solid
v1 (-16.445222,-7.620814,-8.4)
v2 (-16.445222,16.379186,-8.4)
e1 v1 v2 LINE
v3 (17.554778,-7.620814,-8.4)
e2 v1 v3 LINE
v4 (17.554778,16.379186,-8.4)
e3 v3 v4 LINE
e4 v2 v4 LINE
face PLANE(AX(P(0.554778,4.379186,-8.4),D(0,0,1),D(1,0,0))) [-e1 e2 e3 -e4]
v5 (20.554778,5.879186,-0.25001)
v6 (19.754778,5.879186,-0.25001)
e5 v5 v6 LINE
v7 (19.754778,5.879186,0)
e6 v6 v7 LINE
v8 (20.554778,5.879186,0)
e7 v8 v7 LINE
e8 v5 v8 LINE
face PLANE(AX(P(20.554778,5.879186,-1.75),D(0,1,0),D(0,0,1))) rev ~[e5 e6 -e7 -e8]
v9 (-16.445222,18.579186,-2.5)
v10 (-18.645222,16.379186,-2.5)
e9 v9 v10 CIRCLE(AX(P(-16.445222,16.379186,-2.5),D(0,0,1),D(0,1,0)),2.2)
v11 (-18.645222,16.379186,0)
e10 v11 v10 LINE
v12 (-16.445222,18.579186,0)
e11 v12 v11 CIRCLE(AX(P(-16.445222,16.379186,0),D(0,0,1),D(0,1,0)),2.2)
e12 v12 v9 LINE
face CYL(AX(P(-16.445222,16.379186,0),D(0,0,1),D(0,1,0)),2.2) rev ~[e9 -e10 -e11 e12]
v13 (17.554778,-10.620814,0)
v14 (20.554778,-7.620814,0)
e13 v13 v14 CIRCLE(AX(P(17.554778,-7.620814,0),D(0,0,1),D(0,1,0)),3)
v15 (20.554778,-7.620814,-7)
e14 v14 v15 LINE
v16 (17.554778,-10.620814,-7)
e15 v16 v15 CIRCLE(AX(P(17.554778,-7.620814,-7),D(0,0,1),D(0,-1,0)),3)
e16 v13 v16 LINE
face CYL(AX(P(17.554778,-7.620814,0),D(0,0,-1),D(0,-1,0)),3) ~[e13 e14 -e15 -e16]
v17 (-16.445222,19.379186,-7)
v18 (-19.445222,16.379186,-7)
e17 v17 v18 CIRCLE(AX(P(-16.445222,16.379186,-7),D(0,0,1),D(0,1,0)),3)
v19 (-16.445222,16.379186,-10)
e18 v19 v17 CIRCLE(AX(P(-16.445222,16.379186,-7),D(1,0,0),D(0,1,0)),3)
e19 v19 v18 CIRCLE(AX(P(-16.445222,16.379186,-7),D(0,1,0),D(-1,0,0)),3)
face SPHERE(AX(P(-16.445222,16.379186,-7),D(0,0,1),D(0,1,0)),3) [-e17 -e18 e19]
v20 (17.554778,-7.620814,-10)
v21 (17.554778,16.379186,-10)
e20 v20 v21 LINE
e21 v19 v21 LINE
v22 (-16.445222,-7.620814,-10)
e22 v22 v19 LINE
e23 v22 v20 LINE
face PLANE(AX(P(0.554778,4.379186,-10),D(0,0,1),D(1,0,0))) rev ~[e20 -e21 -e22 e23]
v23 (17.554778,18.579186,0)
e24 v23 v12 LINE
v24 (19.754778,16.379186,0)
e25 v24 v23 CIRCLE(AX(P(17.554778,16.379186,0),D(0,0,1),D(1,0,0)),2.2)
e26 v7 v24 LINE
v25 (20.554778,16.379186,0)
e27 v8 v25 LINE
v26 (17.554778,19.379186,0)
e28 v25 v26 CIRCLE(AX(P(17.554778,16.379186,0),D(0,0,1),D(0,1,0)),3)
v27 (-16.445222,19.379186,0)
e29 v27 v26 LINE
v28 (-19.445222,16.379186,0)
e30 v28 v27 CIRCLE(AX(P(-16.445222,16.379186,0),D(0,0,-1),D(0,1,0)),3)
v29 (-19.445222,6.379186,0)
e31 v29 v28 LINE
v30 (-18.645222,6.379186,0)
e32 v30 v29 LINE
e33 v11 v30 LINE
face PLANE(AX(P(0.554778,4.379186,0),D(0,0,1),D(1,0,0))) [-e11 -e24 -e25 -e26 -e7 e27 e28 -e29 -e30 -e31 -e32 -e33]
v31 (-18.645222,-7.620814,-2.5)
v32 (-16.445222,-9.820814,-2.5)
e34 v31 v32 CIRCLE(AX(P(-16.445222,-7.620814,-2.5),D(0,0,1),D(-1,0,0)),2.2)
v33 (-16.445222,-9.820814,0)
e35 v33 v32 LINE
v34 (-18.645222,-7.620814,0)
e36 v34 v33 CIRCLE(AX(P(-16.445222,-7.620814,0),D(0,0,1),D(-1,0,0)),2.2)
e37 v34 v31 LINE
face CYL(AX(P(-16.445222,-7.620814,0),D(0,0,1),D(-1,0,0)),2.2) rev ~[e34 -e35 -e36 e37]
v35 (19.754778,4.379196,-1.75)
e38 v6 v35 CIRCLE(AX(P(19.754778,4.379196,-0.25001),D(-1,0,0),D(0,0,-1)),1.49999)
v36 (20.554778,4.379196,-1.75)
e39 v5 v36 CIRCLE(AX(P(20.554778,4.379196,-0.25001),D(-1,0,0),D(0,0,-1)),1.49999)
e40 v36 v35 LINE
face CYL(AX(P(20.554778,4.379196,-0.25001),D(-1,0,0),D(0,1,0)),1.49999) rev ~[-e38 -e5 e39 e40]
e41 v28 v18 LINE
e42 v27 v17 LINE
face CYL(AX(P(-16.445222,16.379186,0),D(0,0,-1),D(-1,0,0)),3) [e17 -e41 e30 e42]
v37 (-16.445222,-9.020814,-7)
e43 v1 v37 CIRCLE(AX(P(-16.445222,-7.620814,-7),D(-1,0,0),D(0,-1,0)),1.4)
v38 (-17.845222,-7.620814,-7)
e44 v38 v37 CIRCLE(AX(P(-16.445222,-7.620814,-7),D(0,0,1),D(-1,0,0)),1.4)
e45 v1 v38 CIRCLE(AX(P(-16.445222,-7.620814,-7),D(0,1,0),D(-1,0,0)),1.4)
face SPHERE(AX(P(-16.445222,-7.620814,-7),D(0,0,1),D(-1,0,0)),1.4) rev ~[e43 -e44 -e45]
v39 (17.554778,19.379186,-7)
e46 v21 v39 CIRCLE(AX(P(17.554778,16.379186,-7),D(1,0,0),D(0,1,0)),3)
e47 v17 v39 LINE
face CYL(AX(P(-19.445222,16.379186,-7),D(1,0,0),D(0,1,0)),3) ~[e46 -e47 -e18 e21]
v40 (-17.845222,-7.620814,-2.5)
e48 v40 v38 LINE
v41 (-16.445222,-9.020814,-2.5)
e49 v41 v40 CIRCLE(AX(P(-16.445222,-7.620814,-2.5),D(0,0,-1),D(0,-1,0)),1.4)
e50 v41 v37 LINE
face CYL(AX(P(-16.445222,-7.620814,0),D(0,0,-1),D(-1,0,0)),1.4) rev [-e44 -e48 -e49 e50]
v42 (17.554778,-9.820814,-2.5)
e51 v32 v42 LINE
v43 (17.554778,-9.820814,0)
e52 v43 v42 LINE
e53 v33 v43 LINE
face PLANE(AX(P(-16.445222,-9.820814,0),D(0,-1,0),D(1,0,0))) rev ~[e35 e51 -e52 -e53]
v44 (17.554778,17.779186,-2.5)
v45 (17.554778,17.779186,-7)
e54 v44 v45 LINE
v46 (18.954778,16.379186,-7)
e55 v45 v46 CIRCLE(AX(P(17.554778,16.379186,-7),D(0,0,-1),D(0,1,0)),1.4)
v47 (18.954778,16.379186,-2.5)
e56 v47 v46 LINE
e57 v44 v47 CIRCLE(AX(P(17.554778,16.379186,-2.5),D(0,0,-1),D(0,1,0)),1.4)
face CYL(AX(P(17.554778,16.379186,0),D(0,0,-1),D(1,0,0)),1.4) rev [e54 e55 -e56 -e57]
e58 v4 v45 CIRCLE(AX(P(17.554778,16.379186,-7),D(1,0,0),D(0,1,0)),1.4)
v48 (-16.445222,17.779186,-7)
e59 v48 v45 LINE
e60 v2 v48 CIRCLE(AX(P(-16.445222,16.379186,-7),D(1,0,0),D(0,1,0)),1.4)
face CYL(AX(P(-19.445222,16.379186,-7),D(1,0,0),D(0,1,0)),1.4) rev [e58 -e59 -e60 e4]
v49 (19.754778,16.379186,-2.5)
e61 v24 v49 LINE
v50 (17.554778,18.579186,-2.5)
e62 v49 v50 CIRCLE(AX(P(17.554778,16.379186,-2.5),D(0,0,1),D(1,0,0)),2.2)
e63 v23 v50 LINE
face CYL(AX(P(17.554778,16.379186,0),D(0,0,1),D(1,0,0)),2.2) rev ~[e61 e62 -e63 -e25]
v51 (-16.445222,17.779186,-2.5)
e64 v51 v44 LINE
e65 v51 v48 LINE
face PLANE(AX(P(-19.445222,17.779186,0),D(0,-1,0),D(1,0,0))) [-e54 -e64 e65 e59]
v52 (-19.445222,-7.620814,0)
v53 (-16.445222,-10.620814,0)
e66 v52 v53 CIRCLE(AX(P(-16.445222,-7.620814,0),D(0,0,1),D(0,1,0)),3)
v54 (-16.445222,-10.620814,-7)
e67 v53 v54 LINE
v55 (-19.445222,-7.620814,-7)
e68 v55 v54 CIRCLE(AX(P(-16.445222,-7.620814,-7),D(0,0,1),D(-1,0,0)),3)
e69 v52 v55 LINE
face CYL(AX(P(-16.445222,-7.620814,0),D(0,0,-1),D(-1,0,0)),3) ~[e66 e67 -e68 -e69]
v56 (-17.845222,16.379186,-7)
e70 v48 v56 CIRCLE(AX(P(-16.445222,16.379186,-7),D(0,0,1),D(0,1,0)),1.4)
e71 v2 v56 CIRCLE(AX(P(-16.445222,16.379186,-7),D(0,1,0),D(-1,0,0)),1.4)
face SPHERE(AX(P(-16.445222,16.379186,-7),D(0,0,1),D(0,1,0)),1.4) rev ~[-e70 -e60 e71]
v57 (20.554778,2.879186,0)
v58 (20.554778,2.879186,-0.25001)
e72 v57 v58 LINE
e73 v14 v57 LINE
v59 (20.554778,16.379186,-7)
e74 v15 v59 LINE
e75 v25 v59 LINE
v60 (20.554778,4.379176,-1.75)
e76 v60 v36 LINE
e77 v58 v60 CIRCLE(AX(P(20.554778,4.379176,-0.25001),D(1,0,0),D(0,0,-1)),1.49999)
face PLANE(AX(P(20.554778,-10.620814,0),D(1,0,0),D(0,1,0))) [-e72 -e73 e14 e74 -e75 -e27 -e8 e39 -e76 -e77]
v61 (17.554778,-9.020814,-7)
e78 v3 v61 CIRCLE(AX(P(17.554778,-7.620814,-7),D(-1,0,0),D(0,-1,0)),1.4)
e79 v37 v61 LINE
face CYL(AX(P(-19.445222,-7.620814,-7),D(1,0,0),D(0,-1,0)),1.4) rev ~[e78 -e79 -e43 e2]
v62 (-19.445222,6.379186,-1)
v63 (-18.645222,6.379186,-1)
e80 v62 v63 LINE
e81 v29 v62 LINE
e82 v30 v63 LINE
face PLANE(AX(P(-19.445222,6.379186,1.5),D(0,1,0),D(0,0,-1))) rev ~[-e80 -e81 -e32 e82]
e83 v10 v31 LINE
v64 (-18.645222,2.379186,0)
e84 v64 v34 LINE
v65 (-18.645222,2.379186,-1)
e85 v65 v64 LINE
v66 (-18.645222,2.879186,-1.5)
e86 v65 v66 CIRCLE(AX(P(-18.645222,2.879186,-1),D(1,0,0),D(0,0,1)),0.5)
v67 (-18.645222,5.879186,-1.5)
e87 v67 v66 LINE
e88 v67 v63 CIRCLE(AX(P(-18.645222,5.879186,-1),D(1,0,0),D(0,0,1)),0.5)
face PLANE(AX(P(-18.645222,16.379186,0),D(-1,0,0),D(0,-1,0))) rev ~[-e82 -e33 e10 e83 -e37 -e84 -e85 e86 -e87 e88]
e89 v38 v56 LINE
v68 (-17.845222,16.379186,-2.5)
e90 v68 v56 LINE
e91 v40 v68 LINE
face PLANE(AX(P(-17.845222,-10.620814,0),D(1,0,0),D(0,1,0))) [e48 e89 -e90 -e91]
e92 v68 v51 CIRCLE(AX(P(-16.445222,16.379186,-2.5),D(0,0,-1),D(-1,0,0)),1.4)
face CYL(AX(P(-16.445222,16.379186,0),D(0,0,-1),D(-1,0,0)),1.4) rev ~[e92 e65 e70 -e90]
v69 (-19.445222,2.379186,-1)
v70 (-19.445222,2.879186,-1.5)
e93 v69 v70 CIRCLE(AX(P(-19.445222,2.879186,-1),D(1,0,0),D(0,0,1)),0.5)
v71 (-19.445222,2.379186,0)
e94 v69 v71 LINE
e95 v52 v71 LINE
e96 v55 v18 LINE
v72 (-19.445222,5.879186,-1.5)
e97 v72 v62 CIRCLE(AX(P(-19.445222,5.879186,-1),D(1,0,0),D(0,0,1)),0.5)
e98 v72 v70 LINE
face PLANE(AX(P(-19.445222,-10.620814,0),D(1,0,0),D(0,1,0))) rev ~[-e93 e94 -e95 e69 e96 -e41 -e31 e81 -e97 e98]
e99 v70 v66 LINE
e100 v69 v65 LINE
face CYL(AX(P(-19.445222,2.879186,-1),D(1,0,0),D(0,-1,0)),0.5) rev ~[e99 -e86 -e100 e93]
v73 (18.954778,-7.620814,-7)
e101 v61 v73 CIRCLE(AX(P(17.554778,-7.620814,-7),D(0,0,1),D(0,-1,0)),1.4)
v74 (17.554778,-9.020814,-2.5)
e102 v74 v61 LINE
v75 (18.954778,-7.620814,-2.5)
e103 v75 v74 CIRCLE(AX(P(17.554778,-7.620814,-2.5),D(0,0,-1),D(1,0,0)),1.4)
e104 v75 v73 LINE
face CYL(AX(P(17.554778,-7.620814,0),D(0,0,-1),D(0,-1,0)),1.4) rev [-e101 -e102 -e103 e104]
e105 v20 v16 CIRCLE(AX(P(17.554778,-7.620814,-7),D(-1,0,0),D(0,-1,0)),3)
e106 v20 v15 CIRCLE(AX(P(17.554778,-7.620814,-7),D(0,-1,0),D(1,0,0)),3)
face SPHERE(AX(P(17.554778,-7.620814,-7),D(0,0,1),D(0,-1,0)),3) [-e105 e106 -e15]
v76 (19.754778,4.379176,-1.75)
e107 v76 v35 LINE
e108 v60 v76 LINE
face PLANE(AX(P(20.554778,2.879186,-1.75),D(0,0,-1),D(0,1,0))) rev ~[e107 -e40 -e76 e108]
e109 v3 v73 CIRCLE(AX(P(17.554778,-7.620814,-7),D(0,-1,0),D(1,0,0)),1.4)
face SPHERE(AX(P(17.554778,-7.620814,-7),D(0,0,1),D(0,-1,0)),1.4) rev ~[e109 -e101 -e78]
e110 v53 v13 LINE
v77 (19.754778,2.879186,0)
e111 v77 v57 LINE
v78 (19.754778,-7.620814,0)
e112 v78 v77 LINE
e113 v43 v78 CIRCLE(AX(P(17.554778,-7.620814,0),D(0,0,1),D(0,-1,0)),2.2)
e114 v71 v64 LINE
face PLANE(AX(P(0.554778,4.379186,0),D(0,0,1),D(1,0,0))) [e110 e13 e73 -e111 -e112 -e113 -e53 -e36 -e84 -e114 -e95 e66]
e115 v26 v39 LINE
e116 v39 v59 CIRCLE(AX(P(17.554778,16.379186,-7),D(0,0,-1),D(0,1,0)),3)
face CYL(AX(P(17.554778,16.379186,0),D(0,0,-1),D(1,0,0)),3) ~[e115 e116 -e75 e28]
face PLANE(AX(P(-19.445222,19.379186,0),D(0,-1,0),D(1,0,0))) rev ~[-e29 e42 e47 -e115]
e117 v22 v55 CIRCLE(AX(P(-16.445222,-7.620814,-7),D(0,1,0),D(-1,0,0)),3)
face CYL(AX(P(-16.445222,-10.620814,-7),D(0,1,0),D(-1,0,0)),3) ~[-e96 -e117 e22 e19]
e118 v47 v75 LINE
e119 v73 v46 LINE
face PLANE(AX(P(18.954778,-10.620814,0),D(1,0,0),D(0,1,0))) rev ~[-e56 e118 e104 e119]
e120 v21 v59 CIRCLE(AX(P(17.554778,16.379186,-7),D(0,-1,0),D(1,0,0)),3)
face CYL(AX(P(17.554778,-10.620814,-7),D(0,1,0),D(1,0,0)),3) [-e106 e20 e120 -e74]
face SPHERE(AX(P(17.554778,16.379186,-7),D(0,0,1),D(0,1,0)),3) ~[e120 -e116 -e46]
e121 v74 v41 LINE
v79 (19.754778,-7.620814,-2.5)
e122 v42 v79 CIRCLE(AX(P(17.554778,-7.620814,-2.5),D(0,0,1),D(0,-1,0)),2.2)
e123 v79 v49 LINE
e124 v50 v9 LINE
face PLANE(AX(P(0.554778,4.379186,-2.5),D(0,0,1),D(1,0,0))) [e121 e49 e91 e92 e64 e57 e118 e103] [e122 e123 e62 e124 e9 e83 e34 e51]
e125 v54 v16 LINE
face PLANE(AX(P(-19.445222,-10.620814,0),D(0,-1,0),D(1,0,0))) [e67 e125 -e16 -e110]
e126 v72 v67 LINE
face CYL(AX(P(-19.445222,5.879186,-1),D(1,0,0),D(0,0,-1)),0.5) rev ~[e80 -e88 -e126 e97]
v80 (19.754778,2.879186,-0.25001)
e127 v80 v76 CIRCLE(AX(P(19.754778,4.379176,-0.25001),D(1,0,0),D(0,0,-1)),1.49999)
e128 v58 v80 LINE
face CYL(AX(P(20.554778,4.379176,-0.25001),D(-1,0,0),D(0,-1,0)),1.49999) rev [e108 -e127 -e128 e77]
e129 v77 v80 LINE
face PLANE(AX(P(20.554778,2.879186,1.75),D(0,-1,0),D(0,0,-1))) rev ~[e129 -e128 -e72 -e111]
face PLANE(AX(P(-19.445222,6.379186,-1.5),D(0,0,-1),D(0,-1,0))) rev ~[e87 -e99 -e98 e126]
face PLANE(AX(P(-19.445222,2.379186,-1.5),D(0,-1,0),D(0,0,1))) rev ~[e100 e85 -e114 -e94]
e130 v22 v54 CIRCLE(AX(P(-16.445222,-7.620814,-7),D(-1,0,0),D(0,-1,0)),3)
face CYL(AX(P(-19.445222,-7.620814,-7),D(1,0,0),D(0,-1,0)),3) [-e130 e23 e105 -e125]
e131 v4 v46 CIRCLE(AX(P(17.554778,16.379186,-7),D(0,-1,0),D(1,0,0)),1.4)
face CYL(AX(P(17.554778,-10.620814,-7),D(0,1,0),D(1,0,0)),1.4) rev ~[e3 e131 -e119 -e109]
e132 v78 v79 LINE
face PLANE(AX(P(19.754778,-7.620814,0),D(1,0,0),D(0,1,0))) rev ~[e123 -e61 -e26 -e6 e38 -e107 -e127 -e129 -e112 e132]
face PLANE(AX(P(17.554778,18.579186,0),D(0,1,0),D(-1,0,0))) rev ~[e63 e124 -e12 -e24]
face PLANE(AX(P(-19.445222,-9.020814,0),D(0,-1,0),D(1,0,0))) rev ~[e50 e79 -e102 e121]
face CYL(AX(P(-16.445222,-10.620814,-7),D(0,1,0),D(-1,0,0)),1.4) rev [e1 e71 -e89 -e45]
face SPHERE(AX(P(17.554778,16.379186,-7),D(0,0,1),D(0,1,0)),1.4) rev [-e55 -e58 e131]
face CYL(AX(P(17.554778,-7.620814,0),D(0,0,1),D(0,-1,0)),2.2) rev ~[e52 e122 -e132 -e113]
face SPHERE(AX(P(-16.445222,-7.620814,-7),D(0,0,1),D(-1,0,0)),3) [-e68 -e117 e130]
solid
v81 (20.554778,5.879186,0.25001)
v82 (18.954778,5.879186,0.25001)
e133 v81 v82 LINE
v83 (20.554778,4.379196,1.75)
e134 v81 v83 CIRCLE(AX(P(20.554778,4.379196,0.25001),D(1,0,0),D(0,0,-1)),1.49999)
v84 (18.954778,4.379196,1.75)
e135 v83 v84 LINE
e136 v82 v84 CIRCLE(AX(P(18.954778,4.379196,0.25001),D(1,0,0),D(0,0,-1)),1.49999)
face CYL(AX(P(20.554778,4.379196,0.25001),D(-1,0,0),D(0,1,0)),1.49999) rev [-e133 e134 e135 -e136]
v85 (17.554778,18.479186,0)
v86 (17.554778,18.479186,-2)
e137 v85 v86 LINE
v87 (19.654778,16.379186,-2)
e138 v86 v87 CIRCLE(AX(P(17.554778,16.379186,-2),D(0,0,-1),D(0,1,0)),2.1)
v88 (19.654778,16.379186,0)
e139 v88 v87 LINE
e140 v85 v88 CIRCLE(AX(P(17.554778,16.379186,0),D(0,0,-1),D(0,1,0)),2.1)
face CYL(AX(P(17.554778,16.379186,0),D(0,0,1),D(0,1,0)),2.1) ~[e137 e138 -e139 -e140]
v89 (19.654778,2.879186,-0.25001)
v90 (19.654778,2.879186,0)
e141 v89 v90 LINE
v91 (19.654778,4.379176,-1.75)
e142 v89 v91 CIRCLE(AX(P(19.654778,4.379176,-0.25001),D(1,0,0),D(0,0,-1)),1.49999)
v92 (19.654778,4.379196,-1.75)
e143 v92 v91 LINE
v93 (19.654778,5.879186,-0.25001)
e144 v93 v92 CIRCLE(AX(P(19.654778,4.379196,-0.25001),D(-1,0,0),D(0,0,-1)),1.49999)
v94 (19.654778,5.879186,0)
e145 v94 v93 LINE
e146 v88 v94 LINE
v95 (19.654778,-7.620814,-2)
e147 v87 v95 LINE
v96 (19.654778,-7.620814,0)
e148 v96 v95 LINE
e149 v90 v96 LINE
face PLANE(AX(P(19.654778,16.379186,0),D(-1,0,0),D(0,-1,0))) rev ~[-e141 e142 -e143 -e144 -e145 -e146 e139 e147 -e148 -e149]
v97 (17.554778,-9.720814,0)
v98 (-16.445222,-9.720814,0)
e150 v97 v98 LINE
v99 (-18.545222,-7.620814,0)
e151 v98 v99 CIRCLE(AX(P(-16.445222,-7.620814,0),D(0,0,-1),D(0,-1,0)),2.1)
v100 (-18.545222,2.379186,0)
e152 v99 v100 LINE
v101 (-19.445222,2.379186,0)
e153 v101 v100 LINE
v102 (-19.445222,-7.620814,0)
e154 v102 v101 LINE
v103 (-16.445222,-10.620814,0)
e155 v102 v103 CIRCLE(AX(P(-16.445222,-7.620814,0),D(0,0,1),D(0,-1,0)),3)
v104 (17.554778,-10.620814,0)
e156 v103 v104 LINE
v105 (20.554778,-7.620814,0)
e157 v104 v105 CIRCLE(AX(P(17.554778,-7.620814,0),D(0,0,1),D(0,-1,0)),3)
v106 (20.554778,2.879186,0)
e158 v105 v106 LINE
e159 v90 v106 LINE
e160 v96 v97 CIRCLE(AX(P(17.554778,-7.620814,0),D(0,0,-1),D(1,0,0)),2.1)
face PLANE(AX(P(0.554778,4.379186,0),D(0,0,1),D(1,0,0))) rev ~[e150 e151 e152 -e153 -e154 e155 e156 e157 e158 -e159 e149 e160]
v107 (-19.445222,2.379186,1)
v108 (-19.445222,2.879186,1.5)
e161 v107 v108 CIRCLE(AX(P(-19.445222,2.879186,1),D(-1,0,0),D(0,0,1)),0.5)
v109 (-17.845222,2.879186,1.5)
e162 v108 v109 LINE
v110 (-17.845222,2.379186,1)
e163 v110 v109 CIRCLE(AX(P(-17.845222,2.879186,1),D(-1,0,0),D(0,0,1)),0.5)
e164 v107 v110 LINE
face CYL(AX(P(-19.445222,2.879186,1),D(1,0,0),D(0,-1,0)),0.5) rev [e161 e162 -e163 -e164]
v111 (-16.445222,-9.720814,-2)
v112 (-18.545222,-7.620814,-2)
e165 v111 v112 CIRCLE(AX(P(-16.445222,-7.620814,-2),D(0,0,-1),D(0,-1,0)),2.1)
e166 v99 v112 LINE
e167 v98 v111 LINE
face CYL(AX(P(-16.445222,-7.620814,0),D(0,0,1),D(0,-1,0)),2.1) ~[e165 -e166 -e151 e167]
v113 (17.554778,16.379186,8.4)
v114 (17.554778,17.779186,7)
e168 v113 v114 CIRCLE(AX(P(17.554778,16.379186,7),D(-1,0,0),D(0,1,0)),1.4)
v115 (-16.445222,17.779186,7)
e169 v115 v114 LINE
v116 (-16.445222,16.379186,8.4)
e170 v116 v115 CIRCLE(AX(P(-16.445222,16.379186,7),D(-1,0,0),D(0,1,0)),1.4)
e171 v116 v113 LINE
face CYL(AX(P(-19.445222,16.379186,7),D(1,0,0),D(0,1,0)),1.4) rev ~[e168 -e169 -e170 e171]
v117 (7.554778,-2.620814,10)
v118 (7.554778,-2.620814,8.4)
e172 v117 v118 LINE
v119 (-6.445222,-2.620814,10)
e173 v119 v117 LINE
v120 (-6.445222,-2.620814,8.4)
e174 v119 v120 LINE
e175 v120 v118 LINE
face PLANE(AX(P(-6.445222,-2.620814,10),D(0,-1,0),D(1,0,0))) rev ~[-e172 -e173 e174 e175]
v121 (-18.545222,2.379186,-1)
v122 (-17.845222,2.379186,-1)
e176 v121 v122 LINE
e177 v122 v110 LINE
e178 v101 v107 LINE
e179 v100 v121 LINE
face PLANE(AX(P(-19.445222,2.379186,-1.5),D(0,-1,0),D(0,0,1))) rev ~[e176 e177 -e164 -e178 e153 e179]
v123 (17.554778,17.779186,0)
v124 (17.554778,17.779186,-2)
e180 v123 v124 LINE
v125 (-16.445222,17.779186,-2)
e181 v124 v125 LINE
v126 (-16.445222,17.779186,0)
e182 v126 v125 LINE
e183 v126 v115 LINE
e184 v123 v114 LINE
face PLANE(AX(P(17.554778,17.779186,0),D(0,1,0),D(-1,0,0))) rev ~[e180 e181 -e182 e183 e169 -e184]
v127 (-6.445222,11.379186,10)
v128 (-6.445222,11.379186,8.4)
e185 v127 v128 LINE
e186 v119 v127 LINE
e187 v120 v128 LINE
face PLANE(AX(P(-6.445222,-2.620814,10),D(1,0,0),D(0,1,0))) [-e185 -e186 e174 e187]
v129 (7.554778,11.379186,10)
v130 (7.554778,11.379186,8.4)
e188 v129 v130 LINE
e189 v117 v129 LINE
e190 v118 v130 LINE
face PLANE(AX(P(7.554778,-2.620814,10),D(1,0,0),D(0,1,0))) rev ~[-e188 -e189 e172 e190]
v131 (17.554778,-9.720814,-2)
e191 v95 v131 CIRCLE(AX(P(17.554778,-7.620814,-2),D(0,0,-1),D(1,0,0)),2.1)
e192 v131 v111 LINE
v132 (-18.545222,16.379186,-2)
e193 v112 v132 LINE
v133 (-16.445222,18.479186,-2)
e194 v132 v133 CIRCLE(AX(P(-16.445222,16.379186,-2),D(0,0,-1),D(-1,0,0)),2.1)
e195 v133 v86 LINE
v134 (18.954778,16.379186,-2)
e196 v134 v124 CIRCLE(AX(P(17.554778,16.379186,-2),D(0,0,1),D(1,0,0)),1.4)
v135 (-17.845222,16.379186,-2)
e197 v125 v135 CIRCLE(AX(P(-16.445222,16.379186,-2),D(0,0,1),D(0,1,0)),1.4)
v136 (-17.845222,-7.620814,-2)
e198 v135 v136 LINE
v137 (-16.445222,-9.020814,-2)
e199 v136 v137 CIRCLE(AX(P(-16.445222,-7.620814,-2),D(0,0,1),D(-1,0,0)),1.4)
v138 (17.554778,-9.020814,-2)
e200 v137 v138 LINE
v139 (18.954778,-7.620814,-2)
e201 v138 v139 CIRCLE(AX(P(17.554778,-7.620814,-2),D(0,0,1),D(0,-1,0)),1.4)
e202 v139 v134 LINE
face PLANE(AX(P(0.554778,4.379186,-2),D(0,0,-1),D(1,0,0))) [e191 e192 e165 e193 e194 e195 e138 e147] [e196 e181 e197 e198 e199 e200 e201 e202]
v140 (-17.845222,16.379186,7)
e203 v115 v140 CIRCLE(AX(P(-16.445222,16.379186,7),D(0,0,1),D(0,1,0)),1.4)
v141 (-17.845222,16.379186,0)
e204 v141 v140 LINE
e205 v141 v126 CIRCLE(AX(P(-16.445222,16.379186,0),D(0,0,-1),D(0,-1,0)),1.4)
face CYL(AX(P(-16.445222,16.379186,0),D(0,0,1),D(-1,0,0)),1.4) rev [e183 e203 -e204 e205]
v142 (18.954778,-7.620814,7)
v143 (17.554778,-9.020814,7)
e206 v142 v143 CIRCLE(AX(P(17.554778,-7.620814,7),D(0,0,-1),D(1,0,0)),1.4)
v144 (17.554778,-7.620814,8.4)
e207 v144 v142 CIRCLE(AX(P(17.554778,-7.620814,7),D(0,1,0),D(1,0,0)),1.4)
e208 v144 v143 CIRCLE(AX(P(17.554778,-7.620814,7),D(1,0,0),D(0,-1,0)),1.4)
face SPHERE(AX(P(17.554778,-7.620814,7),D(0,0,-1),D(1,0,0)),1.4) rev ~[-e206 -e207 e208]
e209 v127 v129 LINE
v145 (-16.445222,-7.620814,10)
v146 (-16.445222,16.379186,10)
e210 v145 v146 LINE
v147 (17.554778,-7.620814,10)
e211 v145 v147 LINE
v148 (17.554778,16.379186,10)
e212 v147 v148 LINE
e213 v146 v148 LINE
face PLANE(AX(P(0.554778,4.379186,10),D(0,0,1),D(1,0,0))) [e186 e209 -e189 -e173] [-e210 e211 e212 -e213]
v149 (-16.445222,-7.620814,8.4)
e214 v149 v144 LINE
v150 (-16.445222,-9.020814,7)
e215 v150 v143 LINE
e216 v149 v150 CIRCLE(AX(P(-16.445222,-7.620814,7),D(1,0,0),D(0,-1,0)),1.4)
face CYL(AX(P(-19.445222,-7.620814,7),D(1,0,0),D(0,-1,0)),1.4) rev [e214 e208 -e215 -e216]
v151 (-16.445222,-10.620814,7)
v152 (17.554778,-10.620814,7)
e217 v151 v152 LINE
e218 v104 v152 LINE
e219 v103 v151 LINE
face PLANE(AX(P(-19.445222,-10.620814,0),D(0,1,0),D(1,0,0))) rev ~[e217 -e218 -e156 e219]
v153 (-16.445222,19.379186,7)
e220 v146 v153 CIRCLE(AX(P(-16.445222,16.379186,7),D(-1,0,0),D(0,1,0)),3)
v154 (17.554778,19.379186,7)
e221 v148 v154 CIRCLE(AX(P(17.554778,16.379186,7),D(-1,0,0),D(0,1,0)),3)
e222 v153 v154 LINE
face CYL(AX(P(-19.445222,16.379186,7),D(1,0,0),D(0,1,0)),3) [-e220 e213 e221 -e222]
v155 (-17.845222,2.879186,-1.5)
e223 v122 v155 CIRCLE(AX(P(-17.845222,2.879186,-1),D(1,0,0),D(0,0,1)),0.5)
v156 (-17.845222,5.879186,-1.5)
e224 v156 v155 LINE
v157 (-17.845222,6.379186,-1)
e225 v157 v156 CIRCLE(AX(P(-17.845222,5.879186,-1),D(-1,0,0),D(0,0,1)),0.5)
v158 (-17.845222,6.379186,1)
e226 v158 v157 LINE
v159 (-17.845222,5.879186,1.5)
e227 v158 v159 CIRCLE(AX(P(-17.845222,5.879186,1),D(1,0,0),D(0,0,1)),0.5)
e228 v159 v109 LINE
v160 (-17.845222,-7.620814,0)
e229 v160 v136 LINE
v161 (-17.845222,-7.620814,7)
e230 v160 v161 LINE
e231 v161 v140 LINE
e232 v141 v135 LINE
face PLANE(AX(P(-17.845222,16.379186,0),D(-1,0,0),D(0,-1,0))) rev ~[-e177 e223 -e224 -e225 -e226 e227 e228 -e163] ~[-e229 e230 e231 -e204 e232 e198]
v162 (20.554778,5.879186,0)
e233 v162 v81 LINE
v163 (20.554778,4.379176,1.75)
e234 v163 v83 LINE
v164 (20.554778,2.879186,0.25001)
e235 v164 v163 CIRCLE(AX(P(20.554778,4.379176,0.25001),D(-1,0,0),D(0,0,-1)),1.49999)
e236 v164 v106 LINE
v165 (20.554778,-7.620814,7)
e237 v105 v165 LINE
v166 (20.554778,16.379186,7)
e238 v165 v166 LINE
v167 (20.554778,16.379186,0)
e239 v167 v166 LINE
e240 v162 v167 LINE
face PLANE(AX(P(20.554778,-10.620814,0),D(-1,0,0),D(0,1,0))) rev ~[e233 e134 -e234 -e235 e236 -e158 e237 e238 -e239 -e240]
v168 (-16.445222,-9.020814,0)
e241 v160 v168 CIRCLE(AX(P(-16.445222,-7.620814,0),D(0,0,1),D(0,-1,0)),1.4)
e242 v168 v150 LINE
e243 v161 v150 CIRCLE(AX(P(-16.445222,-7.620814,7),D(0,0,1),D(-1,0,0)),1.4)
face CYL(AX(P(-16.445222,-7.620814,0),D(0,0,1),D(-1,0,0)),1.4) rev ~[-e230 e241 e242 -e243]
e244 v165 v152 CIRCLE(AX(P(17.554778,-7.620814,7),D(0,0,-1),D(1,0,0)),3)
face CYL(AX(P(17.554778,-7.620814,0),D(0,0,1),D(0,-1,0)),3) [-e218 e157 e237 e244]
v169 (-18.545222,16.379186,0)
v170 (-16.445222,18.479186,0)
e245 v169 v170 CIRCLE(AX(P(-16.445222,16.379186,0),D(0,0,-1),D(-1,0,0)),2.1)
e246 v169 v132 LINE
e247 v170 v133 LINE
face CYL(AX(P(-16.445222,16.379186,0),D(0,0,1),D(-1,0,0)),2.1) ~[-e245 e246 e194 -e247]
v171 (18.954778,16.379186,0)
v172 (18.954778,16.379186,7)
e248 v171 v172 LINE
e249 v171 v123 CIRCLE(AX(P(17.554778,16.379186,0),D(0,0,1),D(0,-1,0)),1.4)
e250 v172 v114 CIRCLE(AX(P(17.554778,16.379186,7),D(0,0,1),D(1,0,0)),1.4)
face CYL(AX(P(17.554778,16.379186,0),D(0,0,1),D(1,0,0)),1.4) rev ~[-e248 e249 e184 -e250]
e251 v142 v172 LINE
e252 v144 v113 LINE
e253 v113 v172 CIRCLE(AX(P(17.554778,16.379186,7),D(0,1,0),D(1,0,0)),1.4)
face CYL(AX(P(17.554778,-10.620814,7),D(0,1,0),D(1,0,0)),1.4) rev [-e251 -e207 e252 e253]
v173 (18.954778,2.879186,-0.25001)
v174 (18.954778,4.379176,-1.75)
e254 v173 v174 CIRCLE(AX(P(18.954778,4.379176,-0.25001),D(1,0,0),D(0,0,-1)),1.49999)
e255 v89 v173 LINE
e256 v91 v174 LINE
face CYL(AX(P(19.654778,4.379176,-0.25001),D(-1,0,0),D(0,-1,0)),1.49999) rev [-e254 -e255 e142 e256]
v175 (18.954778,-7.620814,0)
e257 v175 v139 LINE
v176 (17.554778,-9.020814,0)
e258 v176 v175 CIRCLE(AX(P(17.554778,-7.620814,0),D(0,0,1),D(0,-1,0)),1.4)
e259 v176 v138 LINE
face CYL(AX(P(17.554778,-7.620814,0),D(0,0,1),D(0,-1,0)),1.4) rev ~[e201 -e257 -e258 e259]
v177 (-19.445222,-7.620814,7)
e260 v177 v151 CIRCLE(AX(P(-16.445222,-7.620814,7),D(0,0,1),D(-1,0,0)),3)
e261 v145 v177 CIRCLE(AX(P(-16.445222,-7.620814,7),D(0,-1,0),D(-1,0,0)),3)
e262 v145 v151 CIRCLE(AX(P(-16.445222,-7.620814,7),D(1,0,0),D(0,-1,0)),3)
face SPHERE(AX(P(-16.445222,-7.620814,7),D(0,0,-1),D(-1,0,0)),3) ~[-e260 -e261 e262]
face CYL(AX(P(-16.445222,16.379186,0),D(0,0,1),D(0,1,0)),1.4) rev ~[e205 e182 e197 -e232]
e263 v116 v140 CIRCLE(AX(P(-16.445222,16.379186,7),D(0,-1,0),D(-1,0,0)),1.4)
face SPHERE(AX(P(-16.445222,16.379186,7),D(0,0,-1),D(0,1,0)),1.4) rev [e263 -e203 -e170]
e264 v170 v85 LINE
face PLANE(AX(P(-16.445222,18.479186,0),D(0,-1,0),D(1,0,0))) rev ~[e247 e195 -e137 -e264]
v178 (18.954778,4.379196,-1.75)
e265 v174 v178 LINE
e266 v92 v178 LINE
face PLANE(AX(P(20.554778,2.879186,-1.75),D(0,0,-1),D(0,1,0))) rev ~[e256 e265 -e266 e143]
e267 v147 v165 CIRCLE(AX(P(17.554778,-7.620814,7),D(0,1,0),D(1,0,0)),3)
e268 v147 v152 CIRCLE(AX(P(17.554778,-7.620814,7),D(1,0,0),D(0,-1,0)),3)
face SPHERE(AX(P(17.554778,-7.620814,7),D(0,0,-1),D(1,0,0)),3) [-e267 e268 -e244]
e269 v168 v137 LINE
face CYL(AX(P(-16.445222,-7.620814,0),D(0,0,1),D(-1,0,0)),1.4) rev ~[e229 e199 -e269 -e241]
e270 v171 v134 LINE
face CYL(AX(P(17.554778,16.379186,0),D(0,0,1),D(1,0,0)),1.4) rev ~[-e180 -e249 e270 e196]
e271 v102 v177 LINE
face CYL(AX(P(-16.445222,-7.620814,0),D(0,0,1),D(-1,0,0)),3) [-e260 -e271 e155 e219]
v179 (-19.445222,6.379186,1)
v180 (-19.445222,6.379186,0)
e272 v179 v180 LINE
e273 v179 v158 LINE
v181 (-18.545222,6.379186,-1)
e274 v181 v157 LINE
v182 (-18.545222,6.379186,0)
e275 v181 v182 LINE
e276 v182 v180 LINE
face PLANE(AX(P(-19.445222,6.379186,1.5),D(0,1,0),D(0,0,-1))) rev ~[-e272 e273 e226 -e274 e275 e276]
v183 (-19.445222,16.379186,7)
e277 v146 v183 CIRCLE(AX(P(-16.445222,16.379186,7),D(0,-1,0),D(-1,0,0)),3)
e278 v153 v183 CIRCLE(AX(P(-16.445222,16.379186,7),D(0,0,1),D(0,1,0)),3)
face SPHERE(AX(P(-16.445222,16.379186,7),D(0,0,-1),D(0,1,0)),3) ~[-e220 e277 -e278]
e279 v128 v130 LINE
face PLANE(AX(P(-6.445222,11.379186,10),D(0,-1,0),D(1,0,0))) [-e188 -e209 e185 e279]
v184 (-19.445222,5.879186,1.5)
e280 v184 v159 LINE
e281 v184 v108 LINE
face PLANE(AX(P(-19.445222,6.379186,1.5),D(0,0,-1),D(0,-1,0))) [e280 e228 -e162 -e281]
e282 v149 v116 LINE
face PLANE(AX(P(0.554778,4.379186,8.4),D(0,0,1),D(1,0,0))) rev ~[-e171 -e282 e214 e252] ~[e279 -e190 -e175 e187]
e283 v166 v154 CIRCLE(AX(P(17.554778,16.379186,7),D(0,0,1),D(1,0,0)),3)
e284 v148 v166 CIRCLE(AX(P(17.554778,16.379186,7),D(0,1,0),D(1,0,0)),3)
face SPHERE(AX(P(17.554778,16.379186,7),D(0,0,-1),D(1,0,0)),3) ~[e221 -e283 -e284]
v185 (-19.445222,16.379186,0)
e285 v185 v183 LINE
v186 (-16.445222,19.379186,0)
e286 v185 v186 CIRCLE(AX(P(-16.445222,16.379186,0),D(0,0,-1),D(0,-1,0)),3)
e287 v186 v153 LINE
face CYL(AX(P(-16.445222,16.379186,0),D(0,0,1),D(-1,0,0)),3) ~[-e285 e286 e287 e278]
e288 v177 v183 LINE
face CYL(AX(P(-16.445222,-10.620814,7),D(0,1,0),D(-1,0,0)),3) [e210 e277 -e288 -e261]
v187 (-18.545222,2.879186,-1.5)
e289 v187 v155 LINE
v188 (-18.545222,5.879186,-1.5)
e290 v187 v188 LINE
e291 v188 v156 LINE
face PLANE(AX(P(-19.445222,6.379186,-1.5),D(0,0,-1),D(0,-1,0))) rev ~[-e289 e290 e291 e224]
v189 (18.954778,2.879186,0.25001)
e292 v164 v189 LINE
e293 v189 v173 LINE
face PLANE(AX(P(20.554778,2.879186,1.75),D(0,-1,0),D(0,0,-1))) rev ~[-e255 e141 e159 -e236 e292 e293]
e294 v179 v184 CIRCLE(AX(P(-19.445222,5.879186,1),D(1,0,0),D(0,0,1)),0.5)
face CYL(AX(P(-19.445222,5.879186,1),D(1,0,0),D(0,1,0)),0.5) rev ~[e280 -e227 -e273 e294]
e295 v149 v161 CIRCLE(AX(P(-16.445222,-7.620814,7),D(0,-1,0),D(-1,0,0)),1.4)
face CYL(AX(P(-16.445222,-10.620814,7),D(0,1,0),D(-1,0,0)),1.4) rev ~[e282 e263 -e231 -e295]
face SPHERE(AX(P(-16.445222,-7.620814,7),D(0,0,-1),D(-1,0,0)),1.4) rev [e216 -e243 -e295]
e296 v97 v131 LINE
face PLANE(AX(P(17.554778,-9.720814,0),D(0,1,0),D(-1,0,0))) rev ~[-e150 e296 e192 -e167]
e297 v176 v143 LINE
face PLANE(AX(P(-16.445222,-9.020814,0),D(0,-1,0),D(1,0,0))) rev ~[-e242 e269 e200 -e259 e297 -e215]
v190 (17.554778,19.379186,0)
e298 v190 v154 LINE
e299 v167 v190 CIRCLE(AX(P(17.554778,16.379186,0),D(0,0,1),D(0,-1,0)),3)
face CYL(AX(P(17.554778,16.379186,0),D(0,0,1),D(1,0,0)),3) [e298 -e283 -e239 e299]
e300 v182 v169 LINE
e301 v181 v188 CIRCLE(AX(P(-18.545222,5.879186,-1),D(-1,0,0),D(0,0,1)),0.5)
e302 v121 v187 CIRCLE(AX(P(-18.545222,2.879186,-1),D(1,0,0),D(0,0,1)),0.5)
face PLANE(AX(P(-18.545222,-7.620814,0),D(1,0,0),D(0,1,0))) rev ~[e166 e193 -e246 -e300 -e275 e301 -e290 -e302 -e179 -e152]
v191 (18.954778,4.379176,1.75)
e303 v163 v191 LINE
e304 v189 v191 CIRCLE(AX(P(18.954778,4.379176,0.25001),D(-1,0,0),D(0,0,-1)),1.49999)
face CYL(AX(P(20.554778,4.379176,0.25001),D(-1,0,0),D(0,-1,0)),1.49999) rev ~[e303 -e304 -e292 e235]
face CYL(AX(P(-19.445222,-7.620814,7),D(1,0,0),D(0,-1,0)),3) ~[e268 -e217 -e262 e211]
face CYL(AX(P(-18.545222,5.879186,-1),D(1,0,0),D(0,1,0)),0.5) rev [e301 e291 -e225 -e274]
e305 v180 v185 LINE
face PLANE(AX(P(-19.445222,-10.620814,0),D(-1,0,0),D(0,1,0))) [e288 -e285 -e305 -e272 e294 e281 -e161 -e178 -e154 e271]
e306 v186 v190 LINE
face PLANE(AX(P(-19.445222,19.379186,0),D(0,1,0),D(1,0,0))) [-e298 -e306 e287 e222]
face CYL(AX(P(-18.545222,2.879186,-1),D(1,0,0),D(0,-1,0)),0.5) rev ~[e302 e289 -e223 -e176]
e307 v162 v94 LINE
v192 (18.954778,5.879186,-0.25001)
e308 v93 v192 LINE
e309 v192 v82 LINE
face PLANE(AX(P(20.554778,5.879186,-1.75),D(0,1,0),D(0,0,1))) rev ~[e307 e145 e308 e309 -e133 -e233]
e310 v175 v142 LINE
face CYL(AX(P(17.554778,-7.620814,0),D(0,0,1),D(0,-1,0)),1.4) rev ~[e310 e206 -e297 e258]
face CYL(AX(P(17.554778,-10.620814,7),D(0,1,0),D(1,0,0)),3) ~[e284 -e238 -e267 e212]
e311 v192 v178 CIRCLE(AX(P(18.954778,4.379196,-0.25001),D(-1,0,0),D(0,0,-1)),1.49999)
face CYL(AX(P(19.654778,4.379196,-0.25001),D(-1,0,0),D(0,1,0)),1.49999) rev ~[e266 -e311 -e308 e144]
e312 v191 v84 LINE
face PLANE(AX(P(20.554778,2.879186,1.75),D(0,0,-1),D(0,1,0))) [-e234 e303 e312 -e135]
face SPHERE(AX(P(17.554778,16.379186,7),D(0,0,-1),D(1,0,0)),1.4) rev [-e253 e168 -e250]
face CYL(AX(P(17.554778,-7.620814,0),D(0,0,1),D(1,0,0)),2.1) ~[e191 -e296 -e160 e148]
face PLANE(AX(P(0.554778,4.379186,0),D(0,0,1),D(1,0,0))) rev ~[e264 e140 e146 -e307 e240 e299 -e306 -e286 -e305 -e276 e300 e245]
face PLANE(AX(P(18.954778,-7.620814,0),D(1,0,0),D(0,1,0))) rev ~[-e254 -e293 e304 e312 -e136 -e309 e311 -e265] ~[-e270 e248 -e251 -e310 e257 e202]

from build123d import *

# Parameters (mm, degrees)
F0_W      = 40
F0_H      = 30
F1_DEPTH  = 10
F2_DEPTH  = 10
F3_R      = 3
F3_2_R    = 3
F4_T      = -1.6
F5_T      = -1.6
F6_W      = 14
F6_H      = 14
F7_DEPTH  = 3
F9_DEPTH  = 2.5
F11_DEPTH = 2
F12_W     = 4
F12_H     = 1.5
F13_DEPTH = 5
F14_R     = 0.5
F14_2_R   = 0.5
F15_W     = 3
F15_H     = 1.75
F16_DEPTH = 5
F17_R     = 1.49999
F17_2_R   = 1.49999


# Not quite as in the source:
# - a fillet or chamfer is up to 0.001 mm smaller than in the source, because OpenCascade refuses the exact size
# - a feature names something its author has since deleted; it is built from what else it names


with BuildPart() as f1:
    # F0 (on Top) → F1 (new body)
    with BuildSketch(Plane.XY):
        with Locations((0.5547776818, 4.3791863923)):
            Rectangle(F0_W, F0_H)
    extrude(amount=F1_DEPTH)


with BuildPart() as f2:
    # F2 (new): a face of the model
    f2_faces = [f1.part.faces().sort_by_distance(p)[0] for p in [
        (0.5547776818, 4.3791863923, 0),
    ]]
    extrude(f2_faces, amount=F2_DEPTH)

    # F3
    f3_edges = [f2.edges().sort_by_distance(p)[0] for p in [
        (-19.445222, -10.620814, -5),
        (20.554778, -10.620814, -5),
        (20.554778, 19.379186, -5),
        (-19.445222, 19.379186, -5),
        (0.554778, 19.379186, -10),
        (-19.445222, 4.379186, -10),
        (0.554778, -10.620814, -10),
        (20.554778, 4.379186, -10),
    ]]
    fillet(f3_edges, radius=F3_R)

    # F4
    f4_openings = [f2.faces().sort_by_distance(p)[0] for p in [
        (0.554778, 4.379186, 0),
    ]]
    offset(amount=F4_T, openings=f4_openings)

    # F8 (on face) → F9 (cut)
    with BuildSketch(Plane.XY):
        with BuildLine():
            Line((19.7547776818, -7.6208136077), (19.7547776818, 16.3791863923))
            ThreePointArc((19.7547776818, 16.3791863923), (19.1104126004, 17.9348213109), (17.5547776818, 18.5791863923))
            Line((17.5547776818, 18.5791863923), (-16.4452223182, 18.5791863923))
            ThreePointArc((-16.4452223182, 18.5791863923), (-18.0008572368, 17.9348213109), (-18.6452223182, 16.3791863923))
            Line((-18.6452223182, 16.3791863923), (-18.6452223182, -7.6208136077))
            ThreePointArc((-18.6452223182, -7.6208136077), (-18.0008572368, -9.1764485263), (-16.4452223182, -9.8208136077))
            Line((-16.4452223182, -9.8208136077), (17.5547776818, -9.8208136077))
            ThreePointArc((17.5547776818, -9.8208136077), (19.1104126004, -9.1764485263), (19.7547776818, -7.6208136077))
        make_face()
        with BuildLine():
            ThreePointArc((17.5547776818, 17.7791863923), (18.5447271755, 17.369135886), (18.9547776818, 16.3791863923))
            Line((18.9547776818, 16.3791863923), (18.9547776818, -7.6208136077))
            ThreePointArc((18.9547776818, -7.6208136077), (18.5447271755, -8.6107631014), (17.5547776818, -9.0208136077))
            Line((17.5547776818, -9.0208136077), (-16.4452223182, -9.0208136077))
            ThreePointArc((-16.4452223182, -9.0208136077), (-17.4351718118, -8.6107631014), (-17.8452223182, -7.6208136077))
            Line((-17.8452223182, -7.6208136077), (-17.8452223182, 16.3791863923))
            ThreePointArc((-17.8452223182, 16.3791863923), (-17.4351718118, 17.369135886), (-16.4452223182, 17.7791863923))
            Line((-16.4452223182, 17.7791863923), (17.5547776818, 17.7791863923))
        make_face(mode=Mode.SUBTRACT)
    extrude(amount=-F9_DEPTH, mode=Mode.SUBTRACT)


with BuildPart() as f1_1:
    add(f1.part)

    # F3#2
    f3_2_edges = [f1_1.edges().sort_by_distance(p)[0] for p in [
        (-19.445222, -10.620814, 5),
        (20.554778, -10.620814, 5),
        (20.554778, 19.379186, 5),
        (-19.445222, 19.379186, 5),
        (20.554778, 4.379186, 10),
        (0.554778, 19.379186, 10),
        (-19.445222, 4.379186, 10),
        (0.554778, -10.620814, 10),
    ]]
    fillet(f3_2_edges, radius=F3_2_R)

    # F5
    f5_openings = [f1_1.faces().sort_by_distance(p)[0] for p in [
        (0.554778, 4.379186, 0),
    ]]
    offset(amount=F5_T, openings=f5_openings)

    # F6 (on face) → F7 (cut)
    with BuildSketch(Plane.XY.offset(10)):
        with Locations((0.5547776818, 4.3791863923)):
            Rectangle(F6_W, F6_H)
    extrude(amount=-F7_DEPTH, mode=Mode.SUBTRACT)

    # F10 (on face) → F11 (join)
    with BuildSketch(Plane(origin=(0, 0, 0), x_dir=(1, 0, 0), z_dir=(0, 0, -1))):
        with BuildLine():
            Line((19.6547776818, -16.3791863923), (19.6547776818, 7.6208136077))
            ThreePointArc((19.6547776818, 7.6208136077), (19.0397019223, 9.1057378482), (17.5547776818, 9.7208136077))
            Line((17.5547776818, 9.7208136077), (-16.4452223182, 9.7208136077))
            ThreePointArc((-16.4452223182, 9.7208136077), (-17.9301465587, 9.1057378482), (-18.5452223182, 7.6208136077))
            Line((-18.5452223182, 7.6208136077), (-18.5452223182, -16.3791863923))
            ThreePointArc((-18.5452223182, -16.3791863923), (-17.9301465587, -17.8641106328), (-16.4452223182, -18.4791863923))
            Line((-16.4452223182, -18.4791863923), (17.5547776818, -18.4791863923))
            ThreePointArc((17.5547776818, -18.4791863923), (19.0397019223, -17.8641106328), (19.6547776818, -16.3791863923))
        make_face()
        with BuildLine():
            ThreePointArc((17.5547776818, 9.0208136077), (18.5447271755, 8.6107631014), (18.9547776818, 7.6208136077))
            Line((18.9547776818, 7.6208136077), (18.9547776818, -16.3791863923))
            ThreePointArc((18.9547776818, -16.3791863923), (18.5447271755, -17.369135886), (17.5547776818, -17.7791863923))
            Line((17.5547776818, -17.7791863923), (-16.4452223182, -17.7791863923))
            ThreePointArc((-16.4452223182, -17.7791863923), (-17.4351718118, -17.369135886), (-17.8452223182, -16.3791863923))
            Line((-17.8452223182, -16.3791863923), (-17.8452223182, 7.6208136077))
            ThreePointArc((-17.8452223182, 7.6208136077), (-17.4351718118, 8.6107631014), (-16.4452223182, 9.0208136077))
            Line((-16.4452223182, 9.0208136077), (17.5547776818, 9.0208136077))
        make_face(mode=Mode.SUBTRACT)
    extrude(amount=F11_DEPTH)


with BuildPart() as f13_tool:
    # F12 (on face) → F13 (new body)
    with BuildSketch(Plane(origin=(-19.4452223182, 0, 0), x_dir=(0, -1, 0), z_dir=(-1, 0, 0))):
        with Locations((-4.3791863923, -0.75)):
            Rectangle(F12_W, F12_H)
        with Locations((-4.3791863923, 0.75)):
            Rectangle(F12_W, F12_H)
    extrude(amount=-F13_DEPTH)


with BuildPart() as f1_2:
    add(f1_1.part)

    # F13: cut by f13_tool
    add(f13_tool.part, mode=Mode.SUBTRACT)

    # F14#2
    f14_2_edges = [f1_2.edges().sort_by_distance(p)[0] for p in [
        (-18.195222, 6.379186, -1.5),
        (-18.195222, 2.379186, -1.5),
        (-18.645222, 6.379186, 1.5),
        (-18.645222, 2.379186, 1.5),
    ]]
    fillet(f14_2_edges, radius=F14_2_R)


with BuildPart() as f2_1:
    add(f2.part)

    # F13: cut by f13_tool
    add(f13_tool.part, mode=Mode.SUBTRACT)

    # F14
    f14_edges = [f2_1.edges().sort_by_distance(p)[0] for p in [
        (-19.045222, 6.379186, -1.5),
        (-19.045222, 2.379186, -1.5),
    ]]
    fillet(f14_edges, radius=F14_R)


with BuildPart() as f16_tool:
    # F15 (on face) → F16 (new body)
    with BuildSketch(Plane.YZ.offset(20.5547776818)):
        with Locations((4.3791863923, 0.875)):
            Rectangle(F15_W, F15_H)
        with Locations((4.3791863923, -0.875)):
            Rectangle(F15_W, F15_H)
    extrude(amount=-F16_DEPTH)


with BuildPart() as f1_3:
    add(f1_2.part)

    # F16: cut by f16_tool
    add(f16_tool.part, mode=Mode.SUBTRACT)

    # F17 (radius 1.5 in the source; OpenCascade refuses exactly that, so slightly less here)
    f17_edges = [f1_3.edges().sort_by_distance(p)[0] for p in [
        (19.304778, 2.879186, -1.75),
        (19.304778, 5.879186, -1.75),
        (19.754778, 2.879186, 1.75),
        (19.754778, 5.879186, 1.75),
    ]]
    fillet(f17_edges, radius=F17_R)


with BuildPart() as f2_2:
    add(f2_1.part)

    # F16: cut by f16_tool
    add(f16_tool.part, mode=Mode.SUBTRACT)

    # F17#2 (radius 1.5 in the source; OpenCascade refuses exactly that, so slightly less here)
    f17_2_edges = [f2_2.edges().sort_by_distance(p)[0] for p in [
        (20.154778, 2.879186, -1.75),
        (20.154778, 5.879186, -1.75),
    ]]
    fillet(f17_2_edges, radius=F17_2_R)


solid = Compound([f1_3.part, f2_2.part])
